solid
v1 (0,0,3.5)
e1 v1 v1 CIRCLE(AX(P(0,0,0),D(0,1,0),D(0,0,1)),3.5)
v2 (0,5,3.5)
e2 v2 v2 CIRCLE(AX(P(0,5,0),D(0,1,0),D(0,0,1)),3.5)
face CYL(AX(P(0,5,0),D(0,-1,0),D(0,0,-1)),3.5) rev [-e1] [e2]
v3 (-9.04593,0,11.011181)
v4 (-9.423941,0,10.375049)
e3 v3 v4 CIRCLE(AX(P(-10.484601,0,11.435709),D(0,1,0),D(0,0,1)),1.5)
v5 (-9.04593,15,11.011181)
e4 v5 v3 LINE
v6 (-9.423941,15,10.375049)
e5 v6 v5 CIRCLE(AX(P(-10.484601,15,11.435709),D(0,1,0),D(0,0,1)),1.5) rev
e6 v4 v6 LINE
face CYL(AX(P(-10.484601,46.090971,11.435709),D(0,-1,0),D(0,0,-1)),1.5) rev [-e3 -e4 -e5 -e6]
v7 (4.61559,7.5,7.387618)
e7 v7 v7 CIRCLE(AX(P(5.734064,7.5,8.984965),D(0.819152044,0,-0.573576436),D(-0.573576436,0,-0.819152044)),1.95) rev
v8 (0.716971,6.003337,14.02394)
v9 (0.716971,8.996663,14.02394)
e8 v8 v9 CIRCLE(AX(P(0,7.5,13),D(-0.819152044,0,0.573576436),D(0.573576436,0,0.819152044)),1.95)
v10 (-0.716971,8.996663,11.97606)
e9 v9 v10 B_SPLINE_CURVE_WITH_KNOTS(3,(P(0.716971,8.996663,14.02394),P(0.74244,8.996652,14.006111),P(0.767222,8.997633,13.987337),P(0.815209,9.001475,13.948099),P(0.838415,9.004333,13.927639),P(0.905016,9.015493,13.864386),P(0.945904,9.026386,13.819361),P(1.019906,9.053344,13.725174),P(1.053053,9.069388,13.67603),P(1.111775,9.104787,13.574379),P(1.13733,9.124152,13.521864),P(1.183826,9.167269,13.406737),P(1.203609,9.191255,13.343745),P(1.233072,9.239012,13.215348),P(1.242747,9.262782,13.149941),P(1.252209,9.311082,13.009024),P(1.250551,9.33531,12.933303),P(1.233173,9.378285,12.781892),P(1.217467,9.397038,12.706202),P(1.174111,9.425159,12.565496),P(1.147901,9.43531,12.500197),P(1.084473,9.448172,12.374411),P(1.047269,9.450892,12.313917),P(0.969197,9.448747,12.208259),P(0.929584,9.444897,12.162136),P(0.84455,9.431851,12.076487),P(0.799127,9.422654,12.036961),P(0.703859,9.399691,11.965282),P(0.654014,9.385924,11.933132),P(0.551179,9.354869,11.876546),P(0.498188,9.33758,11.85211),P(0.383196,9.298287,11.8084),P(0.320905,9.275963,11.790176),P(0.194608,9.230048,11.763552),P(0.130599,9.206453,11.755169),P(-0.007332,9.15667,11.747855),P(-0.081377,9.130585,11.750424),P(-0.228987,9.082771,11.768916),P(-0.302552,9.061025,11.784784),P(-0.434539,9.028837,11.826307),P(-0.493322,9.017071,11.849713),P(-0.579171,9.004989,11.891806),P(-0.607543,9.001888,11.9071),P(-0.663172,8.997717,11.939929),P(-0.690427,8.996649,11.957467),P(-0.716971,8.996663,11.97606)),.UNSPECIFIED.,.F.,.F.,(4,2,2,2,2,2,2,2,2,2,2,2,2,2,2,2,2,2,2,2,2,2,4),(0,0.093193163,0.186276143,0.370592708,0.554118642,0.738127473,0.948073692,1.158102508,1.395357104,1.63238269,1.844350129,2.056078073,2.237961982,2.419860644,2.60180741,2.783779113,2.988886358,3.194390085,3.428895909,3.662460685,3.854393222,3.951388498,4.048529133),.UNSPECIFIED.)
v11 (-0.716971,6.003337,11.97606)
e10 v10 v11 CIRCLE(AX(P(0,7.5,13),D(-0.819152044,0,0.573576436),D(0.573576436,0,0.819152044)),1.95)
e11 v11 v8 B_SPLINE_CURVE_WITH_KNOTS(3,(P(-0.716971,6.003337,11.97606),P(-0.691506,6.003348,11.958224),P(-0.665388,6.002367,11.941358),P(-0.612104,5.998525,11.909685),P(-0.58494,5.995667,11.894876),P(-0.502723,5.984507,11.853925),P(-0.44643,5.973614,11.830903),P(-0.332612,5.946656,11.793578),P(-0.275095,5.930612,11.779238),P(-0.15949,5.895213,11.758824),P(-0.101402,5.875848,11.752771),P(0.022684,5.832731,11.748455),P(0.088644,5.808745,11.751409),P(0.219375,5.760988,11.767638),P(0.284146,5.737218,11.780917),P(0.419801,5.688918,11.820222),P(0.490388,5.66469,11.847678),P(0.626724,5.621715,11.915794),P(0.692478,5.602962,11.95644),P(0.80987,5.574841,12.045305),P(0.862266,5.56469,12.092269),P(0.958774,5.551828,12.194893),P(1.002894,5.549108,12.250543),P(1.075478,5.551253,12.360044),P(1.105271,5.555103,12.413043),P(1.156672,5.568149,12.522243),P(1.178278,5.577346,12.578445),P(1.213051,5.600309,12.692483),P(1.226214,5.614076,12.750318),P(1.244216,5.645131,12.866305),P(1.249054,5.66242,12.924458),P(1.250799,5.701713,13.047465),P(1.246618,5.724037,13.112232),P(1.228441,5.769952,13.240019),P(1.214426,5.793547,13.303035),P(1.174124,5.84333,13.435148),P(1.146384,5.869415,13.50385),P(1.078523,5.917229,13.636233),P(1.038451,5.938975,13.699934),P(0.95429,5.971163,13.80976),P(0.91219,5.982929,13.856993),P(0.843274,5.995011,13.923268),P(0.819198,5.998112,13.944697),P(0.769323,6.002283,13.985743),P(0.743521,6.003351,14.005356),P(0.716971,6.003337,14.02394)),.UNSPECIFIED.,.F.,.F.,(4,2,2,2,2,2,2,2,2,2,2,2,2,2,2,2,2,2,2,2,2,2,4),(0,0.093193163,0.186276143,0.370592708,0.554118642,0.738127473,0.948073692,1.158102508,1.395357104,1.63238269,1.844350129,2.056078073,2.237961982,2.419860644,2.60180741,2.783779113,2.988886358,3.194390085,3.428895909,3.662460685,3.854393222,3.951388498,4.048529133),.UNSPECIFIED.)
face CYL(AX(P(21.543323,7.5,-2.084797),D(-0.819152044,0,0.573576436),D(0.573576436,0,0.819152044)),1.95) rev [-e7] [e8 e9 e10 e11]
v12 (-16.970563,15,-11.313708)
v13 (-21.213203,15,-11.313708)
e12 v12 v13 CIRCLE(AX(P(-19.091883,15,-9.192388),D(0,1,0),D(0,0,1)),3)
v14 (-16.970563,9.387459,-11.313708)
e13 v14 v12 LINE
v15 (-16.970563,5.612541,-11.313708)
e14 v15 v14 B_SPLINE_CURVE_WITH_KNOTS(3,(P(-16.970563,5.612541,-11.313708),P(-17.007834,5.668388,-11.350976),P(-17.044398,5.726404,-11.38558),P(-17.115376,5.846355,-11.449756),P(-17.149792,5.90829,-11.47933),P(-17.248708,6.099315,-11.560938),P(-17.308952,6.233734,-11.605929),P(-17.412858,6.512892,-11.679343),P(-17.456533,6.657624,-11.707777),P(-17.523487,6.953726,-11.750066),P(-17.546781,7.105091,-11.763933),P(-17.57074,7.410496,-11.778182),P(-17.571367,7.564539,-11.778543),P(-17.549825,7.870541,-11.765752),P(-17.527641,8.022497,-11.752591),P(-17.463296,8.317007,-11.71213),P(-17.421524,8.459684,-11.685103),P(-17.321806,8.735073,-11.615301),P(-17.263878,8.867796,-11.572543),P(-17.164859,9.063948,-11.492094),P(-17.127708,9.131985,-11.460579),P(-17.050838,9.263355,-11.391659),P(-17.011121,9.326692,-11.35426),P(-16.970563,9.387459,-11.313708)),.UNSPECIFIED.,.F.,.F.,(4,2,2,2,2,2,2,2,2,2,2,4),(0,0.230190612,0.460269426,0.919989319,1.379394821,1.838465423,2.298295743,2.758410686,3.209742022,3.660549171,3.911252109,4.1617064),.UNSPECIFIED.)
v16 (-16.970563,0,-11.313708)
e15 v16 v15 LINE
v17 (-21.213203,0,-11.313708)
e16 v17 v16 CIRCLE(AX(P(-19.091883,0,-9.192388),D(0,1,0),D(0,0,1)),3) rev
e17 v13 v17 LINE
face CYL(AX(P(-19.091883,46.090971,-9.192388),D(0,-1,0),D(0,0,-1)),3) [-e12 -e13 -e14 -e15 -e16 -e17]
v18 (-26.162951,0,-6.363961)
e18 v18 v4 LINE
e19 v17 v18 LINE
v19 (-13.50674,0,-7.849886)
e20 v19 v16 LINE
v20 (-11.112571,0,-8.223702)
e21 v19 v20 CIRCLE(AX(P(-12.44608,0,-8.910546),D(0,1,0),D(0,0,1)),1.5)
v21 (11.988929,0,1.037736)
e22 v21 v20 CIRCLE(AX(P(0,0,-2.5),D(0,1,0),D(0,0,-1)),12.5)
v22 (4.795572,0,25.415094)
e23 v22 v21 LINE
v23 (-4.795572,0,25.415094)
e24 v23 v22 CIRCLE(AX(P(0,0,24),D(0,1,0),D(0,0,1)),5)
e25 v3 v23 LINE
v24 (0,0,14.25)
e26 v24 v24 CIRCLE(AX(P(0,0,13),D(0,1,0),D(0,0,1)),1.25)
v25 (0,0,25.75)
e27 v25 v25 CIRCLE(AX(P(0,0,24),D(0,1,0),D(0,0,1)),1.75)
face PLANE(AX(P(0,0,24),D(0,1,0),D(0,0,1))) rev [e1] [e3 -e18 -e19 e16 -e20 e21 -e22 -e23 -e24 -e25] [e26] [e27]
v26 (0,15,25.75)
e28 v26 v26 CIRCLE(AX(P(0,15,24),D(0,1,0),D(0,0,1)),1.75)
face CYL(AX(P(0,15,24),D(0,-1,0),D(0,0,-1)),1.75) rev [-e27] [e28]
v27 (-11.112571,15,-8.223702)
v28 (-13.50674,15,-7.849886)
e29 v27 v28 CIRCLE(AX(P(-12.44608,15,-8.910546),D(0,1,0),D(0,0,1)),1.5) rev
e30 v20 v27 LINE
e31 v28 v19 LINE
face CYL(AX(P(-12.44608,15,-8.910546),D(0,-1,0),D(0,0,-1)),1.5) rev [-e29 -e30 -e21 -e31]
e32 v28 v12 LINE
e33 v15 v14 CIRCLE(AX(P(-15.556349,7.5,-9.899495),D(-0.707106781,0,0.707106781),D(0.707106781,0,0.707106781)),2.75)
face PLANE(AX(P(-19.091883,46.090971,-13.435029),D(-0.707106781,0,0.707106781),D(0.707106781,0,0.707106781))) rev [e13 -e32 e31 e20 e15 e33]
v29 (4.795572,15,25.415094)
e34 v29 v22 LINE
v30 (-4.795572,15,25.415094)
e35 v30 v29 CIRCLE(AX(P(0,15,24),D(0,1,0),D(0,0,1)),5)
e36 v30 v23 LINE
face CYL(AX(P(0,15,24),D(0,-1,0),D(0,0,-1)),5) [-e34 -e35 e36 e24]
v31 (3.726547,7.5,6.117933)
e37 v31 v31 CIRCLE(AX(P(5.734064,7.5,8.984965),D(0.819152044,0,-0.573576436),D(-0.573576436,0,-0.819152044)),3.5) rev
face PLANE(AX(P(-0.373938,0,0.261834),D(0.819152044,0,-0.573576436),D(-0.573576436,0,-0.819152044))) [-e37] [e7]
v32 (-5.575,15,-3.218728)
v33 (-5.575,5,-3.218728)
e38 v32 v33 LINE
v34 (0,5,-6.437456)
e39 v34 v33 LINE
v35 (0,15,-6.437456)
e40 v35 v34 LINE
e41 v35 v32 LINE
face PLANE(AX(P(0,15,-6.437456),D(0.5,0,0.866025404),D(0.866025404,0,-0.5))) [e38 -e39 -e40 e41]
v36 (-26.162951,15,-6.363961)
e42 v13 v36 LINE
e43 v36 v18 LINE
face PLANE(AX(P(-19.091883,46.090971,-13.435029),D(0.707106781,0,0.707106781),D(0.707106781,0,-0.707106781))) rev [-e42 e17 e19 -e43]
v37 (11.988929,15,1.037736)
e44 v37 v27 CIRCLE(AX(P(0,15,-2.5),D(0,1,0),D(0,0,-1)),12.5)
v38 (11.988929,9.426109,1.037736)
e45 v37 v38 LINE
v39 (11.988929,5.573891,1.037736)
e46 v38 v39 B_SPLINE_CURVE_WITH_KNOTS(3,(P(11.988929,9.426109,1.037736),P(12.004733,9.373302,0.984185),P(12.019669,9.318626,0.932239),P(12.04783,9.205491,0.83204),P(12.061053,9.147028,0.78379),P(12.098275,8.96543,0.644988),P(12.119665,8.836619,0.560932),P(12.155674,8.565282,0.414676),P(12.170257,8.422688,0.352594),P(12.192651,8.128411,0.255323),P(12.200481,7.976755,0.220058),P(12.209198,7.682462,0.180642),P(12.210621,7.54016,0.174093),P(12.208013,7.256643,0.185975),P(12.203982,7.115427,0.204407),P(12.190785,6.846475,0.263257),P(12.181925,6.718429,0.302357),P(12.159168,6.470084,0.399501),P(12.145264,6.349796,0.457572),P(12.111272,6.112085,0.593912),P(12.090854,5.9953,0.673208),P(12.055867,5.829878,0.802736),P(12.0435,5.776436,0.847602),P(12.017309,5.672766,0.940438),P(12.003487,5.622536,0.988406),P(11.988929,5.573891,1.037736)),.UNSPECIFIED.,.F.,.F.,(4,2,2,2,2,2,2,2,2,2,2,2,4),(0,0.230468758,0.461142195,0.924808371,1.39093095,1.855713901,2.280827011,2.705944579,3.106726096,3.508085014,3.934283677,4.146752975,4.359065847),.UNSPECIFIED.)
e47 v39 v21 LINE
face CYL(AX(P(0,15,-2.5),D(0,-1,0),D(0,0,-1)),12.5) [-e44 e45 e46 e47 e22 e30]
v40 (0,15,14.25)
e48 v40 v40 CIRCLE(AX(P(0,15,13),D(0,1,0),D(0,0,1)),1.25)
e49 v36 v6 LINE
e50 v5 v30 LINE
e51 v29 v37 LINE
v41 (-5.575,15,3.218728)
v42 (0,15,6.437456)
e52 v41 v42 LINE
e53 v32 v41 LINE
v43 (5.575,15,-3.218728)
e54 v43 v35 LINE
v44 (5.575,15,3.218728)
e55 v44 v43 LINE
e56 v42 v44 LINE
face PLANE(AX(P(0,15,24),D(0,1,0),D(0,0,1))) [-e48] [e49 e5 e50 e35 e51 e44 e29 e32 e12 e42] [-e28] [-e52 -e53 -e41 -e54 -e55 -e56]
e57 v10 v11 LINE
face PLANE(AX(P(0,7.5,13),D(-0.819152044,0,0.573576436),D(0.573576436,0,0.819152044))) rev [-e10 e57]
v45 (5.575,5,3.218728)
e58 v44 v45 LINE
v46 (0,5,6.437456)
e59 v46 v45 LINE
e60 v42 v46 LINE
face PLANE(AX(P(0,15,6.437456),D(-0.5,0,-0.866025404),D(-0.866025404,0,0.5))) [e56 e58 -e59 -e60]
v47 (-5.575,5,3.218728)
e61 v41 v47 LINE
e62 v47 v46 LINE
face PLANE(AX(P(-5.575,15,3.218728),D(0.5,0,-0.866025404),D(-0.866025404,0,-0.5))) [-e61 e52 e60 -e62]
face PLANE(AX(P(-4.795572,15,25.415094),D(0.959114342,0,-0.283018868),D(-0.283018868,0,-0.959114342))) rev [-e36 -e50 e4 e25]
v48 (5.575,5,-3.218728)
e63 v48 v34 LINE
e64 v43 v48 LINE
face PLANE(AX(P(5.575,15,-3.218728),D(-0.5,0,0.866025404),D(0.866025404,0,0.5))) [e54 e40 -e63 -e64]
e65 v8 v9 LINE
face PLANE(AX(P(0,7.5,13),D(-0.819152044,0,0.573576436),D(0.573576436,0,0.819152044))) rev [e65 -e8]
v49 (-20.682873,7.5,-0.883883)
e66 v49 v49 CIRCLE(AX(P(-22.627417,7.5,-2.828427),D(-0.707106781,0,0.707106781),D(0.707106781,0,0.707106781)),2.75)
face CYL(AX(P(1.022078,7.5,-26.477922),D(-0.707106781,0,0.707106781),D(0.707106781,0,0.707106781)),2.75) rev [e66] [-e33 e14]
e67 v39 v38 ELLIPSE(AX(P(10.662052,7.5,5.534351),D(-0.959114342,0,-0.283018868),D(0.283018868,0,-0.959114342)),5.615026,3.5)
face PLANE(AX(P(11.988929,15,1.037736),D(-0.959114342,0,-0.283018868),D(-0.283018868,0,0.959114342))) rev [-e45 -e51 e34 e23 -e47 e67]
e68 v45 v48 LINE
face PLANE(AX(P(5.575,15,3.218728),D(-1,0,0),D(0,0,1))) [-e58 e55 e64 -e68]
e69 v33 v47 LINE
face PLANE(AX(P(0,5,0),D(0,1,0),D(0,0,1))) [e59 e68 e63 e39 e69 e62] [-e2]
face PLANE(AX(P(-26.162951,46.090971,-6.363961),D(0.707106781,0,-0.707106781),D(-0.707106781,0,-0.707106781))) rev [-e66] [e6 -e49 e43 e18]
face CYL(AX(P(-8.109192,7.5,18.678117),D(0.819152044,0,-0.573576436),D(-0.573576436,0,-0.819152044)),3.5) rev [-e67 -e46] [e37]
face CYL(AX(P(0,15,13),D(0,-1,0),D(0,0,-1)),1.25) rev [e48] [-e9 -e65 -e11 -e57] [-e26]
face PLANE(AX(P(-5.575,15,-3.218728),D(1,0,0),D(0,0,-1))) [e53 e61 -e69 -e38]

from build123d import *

# Parameters (mm, degrees)
SKETCH1_R           = 1.75
BOSS_EXTRUDE1_DEPTH = 15
SKETCH10_R          = 1.25
CUT_EXTRUDE3_DEPTH  = 35.960692213
SKETCH11_R          = 1.95
CUT_EXTRUDE4_DEPTH  = 47.58229165
SKETCH12_R          = 3.5
BOSS_EXTRUDE8_DEPTH = 5
BOSS_EXTRUDE9_DEPTH = 15
SKETCH14_R          = 2.75
CUT_EXTRUDE5_DEPTH  = 37.697714159
FILLET1_R           = 3
FILLET2_R           = 1.5
SKETCH15_R          = 3.5
CUT_EXTRUDE6_DEPTH  = 13


with BuildPart() as part:
    # Sketch1 → Boss-Extrude1 (new body)
    with BuildSketch(Plane(origin=(0, 0, 0), x_dir=(1, 0, 0), z_dir=(0, 1, 0))):
        with BuildLine():
            Line((-4.795571708, -25.41509434), (-11.988929271, -1.037735849))
            ThreePointArc((-11.988929271, -1.037735849), (0, 15), (11.988929271, -1.037735849))
            Line((11.988929271, -1.037735849), (4.795571708, -25.41509434))
            ThreePointArc((4.795571708, -25.41509434), (0, -29), (-4.795571708, -25.41509434))
        make_face()
        with Locations(Location((0, -24, 0), (0, 0, 270))):
            Circle(SKETCH1_R, mode=Mode.SUBTRACT)
        Polygon((0, -6.437455501), (5.575, -3.218727751), (5.575, 3.218727751), (0, 6.437455501), (-5.575, 3.218727751), (-5.575, -3.218727751), align=None, mode=Mode.SUBTRACT)
    extrude(amount=BOSS_EXTRUDE1_DEPTH)

    # Sketch10 → Cut-Extrude3 (cut, through all)
    with BuildSketch(Plane(origin=(0, 0, 0), x_dir=(1, 0, 0), z_dir=(0, 1, 0))):
        with Locations(Location((0, -13, 0), (0, 0, 270))):
            Circle(SKETCH10_R)
    extrude(amount=CUT_EXTRUDE3_DEPTH, mode=Mode.SUBTRACT)

    # Sketch11 → Cut-Extrude4 (cut, through all)
    with BuildSketch(Plane(origin=(7.806004581, 0, 24.148129883), x_dir=(0.5735764363510473, 0, 0.819152044288991), z_dir=(-0.819152044288991, 0, 0.5735764363510473))):
        with Locations((-13.609353673, 7.5)):
            Circle(SKETCH11_R)
    extrude(amount=-CUT_EXTRUDE4_DEPTH, mode=Mode.SUBTRACT)

    # Sketch12 → Boss-Extrude8 (add)
    with BuildSketch(Plane(origin=(0, 0, 0), x_dir=(1, 0, 0), z_dir=(0, 1, 0))):
        Polygon((5.575, -3.218727751), (5.575, 3.218727751), (0, 6.437455501), (-5.575, 3.218727751), (-5.575, -3.218727751), (0, -6.437455501), align=None)
        with Locations(Location((0, 0, 0), (0, 0, 270))):
            Circle(SKETCH12_R, mode=Mode.SUBTRACT)
    extrude(amount=BOSS_EXTRUDE8_DEPTH)

    # Sketch13 → Boss-Extrude9 (add)
    with BuildSketch(Plane(origin=(0, 0, 0), x_dir=(1, 0, 0), z_dir=(0, 1, 0))):
        Polygon((-19.091883092, 13.435028843), (-26.162950904, 6.363961031), (-8, -11.798989873), (-8, 2.343145751), align=None)
    extrude(amount=BOSS_EXTRUDE9_DEPTH)

    # Sketch14 → Cut-Extrude5 (cut, through all)
    with BuildSketch(Plane(origin=(-9.899494937, 0, 9.899494937), x_dir=(0.707106781186549, 0, 0.707106781186546), z_dir=(-0.707106781186546, 0, 0.707106781186549))):
        with Locations((-18, 7.5)):
            Circle(SKETCH14_R)
    extrude(amount=-CUT_EXTRUDE5_DEPTH, mode=Mode.SUBTRACT)

    # Fillet1
    # the kernel refuses this fillet: 3 mm, written as the material it takes off along each edge
    with BuildSketch(Plane(origin=(-19.091883092, -7.5, -13.435028843), x_dir=(0.7071067811865492, 0, 0.7071067811865457), z_dir=(0, 1, 0))) as fillet1_piece_1:
        with BuildLine():
            CenterArc((FILLET1_R, -FILLET1_R), FILLET1_R, 90, 90)
            Line((0, -FILLET1_R), (0, 0))
            Line((0, 0), (FILLET1_R, 0))
        make_face()
    extrude(amount=30, mode=Mode.SUBTRACT)

    # Fillet2
    fillet2_edges = [part.edges().sort_by_distance(p)[0] for p in [
        (-9.153981014, 7.5, 10.645008859),
        (-11.920074413, 7.5, -6.263220163),
    ]]
    fillet(fillet2_edges, radius=FILLET2_R)

    # Sketch15 → Cut-Extrude6 (cut)
    with BuildSketch(Plane(origin=(10.275038851, 0, -7.194659659), x_dir=(0, -1, 0), z_dir=(0.819152044288991, 0, -0.5735764363510473))):
        with Locations(Location((-7.5, -10.648976576, 0), (0, 0, 90))):
            Circle(SKETCH15_R)
    extrude(amount=-CUT_EXTRUDE6_DEPTH, mode=Mode.SUBTRACT)


solid = part.part
